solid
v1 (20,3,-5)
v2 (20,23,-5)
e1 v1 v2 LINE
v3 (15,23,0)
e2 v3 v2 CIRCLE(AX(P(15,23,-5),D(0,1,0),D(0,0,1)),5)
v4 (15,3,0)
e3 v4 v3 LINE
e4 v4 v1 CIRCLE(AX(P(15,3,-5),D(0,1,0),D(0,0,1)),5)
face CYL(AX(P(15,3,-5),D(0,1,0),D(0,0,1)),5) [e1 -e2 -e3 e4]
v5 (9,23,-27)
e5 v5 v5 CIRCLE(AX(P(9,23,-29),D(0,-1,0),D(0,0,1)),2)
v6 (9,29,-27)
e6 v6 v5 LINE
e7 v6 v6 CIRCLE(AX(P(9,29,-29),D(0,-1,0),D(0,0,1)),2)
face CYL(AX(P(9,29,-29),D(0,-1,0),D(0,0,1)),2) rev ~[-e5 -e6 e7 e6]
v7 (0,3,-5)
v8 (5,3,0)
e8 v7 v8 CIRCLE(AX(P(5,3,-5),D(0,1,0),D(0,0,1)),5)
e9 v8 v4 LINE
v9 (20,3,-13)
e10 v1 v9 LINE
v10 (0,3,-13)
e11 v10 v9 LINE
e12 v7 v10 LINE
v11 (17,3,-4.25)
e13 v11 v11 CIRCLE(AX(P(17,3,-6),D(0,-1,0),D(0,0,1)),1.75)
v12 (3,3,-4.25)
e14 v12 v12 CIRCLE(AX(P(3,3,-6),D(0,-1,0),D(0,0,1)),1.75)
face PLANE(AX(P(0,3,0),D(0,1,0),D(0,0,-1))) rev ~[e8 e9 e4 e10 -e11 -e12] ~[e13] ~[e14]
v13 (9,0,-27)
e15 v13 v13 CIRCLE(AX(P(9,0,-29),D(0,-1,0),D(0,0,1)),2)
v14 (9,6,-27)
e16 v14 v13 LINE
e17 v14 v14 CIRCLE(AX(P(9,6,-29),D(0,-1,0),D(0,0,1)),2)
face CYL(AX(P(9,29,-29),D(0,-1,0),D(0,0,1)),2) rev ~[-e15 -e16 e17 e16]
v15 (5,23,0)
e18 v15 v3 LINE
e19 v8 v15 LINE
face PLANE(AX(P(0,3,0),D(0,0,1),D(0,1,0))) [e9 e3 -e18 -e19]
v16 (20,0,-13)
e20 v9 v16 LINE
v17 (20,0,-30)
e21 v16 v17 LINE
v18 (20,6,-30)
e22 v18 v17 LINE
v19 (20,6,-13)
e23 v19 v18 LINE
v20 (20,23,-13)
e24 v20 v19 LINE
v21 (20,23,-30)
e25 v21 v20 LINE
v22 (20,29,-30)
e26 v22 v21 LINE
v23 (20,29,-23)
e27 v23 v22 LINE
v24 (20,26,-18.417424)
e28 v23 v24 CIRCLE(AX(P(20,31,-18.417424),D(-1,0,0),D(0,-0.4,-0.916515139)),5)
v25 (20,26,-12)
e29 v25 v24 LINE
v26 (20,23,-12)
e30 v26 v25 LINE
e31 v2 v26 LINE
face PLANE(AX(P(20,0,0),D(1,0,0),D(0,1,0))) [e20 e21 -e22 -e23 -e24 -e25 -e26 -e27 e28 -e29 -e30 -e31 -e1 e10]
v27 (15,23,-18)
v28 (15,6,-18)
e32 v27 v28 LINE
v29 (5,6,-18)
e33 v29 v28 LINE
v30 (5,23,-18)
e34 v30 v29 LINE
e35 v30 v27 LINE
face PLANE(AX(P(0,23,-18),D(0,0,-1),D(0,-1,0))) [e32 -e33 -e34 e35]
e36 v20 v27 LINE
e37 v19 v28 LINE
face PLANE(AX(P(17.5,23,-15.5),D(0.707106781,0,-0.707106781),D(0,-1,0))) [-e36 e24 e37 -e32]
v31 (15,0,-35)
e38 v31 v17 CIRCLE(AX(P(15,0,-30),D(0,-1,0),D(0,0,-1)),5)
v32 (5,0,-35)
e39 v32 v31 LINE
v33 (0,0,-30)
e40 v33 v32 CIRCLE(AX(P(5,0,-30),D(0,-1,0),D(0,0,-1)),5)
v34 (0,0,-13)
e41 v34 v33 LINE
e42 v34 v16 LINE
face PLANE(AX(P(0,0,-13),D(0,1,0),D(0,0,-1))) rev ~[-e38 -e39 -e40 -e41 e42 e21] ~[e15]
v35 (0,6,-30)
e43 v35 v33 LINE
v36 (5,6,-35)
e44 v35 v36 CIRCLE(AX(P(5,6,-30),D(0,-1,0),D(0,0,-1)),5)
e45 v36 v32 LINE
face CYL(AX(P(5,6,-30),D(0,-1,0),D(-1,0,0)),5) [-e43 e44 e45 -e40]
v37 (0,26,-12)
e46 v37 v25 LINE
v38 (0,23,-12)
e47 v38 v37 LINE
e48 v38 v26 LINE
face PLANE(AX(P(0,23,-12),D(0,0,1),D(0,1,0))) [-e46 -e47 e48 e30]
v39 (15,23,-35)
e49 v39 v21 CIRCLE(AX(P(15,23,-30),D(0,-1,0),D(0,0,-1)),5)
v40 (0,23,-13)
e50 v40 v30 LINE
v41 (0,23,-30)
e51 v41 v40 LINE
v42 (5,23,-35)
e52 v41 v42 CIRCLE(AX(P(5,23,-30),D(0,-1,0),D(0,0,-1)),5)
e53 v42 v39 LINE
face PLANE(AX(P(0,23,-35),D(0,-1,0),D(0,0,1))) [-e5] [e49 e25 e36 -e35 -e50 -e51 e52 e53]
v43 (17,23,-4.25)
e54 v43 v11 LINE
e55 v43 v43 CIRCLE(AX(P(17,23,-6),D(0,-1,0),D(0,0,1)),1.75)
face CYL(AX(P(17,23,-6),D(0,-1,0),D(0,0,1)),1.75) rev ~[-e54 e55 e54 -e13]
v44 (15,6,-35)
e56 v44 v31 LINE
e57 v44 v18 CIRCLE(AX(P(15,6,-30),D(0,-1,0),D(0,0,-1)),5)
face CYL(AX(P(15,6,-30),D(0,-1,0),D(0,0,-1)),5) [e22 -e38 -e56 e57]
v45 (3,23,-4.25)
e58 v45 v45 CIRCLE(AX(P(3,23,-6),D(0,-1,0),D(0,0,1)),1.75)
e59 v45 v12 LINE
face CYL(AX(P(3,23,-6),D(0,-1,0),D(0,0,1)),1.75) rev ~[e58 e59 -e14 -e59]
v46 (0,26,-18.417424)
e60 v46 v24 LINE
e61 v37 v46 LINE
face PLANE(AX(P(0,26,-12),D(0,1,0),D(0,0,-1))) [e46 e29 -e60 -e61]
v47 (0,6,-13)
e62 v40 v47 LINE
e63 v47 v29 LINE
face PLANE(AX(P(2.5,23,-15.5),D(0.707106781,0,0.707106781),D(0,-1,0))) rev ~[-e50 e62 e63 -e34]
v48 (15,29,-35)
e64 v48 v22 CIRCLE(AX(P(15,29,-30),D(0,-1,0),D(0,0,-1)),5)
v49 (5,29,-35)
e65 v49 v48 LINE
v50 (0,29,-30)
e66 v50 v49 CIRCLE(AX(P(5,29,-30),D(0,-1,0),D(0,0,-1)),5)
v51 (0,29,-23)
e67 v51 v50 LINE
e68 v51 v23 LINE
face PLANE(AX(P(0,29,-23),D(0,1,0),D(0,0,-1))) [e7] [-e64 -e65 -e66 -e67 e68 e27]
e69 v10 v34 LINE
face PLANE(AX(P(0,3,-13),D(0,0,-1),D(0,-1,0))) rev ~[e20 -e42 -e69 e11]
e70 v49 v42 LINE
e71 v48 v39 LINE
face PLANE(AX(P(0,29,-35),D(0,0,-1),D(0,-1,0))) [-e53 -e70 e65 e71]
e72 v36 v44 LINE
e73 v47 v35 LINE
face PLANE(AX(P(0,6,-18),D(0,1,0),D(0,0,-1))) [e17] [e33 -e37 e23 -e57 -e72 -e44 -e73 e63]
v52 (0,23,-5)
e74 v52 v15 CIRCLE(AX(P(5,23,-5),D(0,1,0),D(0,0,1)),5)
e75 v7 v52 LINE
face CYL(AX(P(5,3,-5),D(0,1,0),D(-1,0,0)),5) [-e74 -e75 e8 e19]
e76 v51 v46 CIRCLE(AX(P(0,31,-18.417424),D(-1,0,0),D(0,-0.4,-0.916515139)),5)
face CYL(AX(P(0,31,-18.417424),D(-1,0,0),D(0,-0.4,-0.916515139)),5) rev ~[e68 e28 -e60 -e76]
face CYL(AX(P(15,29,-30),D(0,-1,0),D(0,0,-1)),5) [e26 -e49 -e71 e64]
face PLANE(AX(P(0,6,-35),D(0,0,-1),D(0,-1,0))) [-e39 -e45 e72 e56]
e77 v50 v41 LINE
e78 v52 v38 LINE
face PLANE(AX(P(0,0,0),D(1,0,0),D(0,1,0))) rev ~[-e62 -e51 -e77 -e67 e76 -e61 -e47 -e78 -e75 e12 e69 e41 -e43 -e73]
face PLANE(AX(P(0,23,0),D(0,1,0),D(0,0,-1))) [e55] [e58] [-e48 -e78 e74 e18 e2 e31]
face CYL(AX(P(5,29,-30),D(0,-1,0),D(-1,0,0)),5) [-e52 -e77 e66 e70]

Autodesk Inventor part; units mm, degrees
ref_plane "YZ Plane" through (0, 0, 0) normal (1, 0, 0) x (0, 1, 0)
ref_plane "XZ Plane" through (0, 0, 0) normal (0, 1, 0) x (-1, 0, 0)
ref_plane "XY Plane" through (0, 0, 0) normal (0, 0, 1) x (1, 0, 0)
sketch "Esquisse1" plane through (0, 0, 0) normal (1, 0, 0) x (0, 1, 0)
  line L0 (3, 0) -> (23, 0)
  line L1 (23, 0) -> (23, -12)
  line L2 (23, -12) -> (26, -12)
  line L3 (26, -12) -> (26, -23)
  line L4 (29, -35) -> (23, -35)
  line L5 (23, -35) -> (23, -18)
  line L6 (23, -18) -> (6, -18)
  line L7 (6, -18) -> (6, -35)
  line L8 (6, -35) -> (0, -35)
  line L9 (26, -23) -> (29, -23)
  line L10 (29, -23) -> (29, -35)
  line L11 (3, 0) -> (3, -13)
  line L12 (3, -13) -> (0, -13)
  line L13 (0, -13) -> (0, -35)
  point P0 (0, 0)
  dimension "d0" = 35
  dimension "d2" = 17
  dimension "d4" = 17
  dimension "d6" = 3
  dimension "d7" = 12
  dimension "d8" = 12
  dimension "d10" = 3
  dimension "d34" = 13
  dimension "d35" = 3
  dimension "d36" = 29
  dimension "d37" = 6
  dimension "d38" = 0
  dimension "d44" = 0
extrude "Extrusion1" add sketch "Esquisse1" along normal blind 20
sketch "Esquisse2" plane through (0, 29, -23) normal (0, 1, 0) x (1, 0, 0)
  line L0 (0, 12) -> (20, 12) projected
  line L1 (20, 12) -> (20, 0) projected
  point P0 (0, -23)
  point P1 (9, 6)
  dimension "d20" = 6
  dimension "d21" = 11
hole "Perçage1" at (9, 29, -29) direction (0, -1, 0) diameter 4 end through all
sketch "Esquisse3" plane through (0, 23, 0) normal (0, 1, 0) x (1, 0, 0)
  line L0 (0, 0) -> (20, 0) projected
  line L1 (0, 12) -> (0, 0) projected
  point P0 (3, 6)
  dimension "d29" = 6
  dimension "d30" = 3
hole "Perçage2" at (3, 23, -6) direction (0, -1, 0) diameter 3.5 end through all
pattern_linear "Réseau rectangulaire1" count 2 spacing 14 along (1, 0, 0) of "Perçage2"
chamfer "Chanfrein1" distance 5 angle 45 2 edges at (0, 14.5, -18) (20, 14.5, -18)
fillet "Congé1" radius 5 6 edges at (0, 26, -35) (20, 26, -35) (0, 3, -35) (20, 3, -35) (20, 13, 0) (0, 13, 0)
fillet "Congé2" radius 5 1 edges at (10, 26, -23)
properties part number "support_avant_3DPrint"
